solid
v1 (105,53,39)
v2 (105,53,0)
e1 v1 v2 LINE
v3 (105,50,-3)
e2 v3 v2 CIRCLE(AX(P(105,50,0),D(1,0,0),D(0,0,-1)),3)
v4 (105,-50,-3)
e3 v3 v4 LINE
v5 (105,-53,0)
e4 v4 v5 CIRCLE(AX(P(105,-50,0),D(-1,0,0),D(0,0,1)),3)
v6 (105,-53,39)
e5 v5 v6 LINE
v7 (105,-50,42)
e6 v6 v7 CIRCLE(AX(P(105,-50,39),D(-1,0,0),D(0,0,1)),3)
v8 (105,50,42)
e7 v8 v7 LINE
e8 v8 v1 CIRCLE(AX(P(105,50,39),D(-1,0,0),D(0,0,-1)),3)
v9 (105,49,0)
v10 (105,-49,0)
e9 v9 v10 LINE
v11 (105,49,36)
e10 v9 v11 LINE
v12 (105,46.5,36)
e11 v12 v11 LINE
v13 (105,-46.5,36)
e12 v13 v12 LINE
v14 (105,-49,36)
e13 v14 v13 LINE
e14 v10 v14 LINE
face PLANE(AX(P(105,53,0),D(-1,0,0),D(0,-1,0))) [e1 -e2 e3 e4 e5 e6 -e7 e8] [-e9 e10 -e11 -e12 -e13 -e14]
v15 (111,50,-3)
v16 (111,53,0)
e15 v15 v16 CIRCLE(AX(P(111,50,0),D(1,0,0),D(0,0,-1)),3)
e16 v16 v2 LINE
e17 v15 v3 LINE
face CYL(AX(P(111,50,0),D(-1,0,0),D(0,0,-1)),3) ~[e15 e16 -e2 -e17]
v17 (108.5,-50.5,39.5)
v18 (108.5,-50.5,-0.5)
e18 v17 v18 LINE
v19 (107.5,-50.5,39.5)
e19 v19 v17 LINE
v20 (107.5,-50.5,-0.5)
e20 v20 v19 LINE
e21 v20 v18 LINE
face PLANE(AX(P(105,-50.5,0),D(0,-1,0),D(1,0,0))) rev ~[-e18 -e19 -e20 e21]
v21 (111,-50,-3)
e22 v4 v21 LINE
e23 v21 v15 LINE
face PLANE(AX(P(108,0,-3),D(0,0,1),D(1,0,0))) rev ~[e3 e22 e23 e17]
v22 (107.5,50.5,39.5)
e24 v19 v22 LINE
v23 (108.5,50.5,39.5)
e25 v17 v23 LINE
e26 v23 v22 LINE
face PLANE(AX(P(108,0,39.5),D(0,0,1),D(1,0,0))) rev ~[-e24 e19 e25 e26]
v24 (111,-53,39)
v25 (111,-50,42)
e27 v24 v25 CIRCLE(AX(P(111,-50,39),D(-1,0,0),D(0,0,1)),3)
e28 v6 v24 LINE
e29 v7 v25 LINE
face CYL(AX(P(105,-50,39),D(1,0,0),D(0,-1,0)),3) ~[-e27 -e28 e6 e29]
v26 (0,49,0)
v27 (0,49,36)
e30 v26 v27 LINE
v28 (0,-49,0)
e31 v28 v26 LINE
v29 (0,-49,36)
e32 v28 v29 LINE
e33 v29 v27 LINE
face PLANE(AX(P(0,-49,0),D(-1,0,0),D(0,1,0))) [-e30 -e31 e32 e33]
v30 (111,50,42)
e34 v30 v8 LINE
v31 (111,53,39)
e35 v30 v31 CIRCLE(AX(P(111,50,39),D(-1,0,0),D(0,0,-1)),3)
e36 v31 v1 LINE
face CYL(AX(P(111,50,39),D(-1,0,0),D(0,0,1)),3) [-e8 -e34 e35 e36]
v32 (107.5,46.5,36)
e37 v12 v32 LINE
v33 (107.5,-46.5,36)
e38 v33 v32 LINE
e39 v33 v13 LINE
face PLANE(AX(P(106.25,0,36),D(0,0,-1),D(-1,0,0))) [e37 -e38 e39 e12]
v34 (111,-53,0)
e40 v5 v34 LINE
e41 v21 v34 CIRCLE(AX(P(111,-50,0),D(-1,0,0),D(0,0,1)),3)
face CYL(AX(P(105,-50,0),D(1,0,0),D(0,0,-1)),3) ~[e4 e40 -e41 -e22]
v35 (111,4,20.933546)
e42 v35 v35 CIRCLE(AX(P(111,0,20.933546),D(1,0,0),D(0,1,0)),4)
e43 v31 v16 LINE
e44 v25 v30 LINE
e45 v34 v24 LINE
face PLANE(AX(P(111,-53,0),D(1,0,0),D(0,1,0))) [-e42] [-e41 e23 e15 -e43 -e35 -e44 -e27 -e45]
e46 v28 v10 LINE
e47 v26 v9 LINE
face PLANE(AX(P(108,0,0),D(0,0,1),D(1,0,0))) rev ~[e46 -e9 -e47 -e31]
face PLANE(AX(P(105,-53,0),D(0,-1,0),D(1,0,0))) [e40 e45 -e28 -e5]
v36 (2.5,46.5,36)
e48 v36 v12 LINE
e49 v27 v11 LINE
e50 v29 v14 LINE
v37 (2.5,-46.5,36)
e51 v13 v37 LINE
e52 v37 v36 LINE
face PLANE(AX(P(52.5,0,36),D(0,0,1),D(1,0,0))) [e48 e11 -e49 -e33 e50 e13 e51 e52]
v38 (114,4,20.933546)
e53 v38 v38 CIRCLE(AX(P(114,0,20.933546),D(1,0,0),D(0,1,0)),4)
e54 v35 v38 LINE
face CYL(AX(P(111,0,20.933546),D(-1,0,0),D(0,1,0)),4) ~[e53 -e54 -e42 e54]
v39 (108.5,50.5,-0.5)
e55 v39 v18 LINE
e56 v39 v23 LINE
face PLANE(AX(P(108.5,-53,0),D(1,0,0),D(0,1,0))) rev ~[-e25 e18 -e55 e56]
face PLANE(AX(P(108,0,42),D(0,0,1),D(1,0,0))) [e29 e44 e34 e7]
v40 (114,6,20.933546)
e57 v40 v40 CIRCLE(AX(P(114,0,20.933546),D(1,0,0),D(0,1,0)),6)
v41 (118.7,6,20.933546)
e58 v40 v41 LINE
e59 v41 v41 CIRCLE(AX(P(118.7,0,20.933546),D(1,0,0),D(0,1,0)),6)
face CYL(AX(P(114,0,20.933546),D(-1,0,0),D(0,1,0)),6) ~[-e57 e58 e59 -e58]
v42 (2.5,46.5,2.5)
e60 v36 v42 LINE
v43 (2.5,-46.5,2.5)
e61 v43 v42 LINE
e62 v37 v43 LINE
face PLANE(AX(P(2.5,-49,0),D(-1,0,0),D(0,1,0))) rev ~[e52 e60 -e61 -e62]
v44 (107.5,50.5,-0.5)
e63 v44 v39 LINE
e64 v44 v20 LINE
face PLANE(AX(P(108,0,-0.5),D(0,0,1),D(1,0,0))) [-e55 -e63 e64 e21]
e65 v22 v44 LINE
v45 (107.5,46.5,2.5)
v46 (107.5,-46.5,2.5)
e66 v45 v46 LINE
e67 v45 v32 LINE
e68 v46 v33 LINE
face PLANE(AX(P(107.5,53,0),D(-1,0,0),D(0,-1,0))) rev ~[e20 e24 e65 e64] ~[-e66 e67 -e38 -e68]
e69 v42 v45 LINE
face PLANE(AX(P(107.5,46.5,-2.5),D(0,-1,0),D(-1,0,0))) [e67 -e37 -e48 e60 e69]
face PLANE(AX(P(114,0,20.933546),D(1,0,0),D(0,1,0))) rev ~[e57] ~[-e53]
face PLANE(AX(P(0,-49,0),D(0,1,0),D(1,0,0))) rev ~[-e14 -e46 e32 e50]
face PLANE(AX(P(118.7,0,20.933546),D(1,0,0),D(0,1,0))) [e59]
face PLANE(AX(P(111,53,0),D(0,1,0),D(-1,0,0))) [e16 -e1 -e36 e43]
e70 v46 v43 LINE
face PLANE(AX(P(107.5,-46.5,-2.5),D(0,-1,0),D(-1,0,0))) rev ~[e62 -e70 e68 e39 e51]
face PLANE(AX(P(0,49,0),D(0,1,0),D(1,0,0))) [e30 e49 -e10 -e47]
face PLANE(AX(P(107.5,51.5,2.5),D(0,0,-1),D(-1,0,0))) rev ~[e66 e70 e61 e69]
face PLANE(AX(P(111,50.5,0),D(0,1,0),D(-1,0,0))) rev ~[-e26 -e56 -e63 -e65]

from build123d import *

# Parameters (mm, degrees)
F0_W        = 105
F0_H        = 98
F1_DEPTH    = 36
F2_DEPTH    = 42
F3_DEPTH    = 3
F4_T        = 2.5
F4_T3_DEPTH = 41
F4_T5_DEPTH = 103
F5_R        = 3
F6_R        = 4
F7_DEPTH    = 3
F8_R        = 6
F9_DEPTH    = 4.7


# Not quite as in the source:
# - a shell that OpenCascade refuses in one call is made with other operations: the cavity is built on its own and cut out


with BuildPart() as f1:
    # F0 (on Top) → F1 (new body)
    with BuildSketch(Plane.XY):
        with Locations((52.5, 0)):
            Rectangle(F0_W, F0_H)
    extrude(amount=F1_DEPTH)

    # F0 (on Top) → F2 (join)
    with BuildSketch(Plane.XY):
        Polygon((105, 53), (105, 49), (105, -49), (105, -53), (111, -53), (111, 53), align=None)
    extrude(amount=F2_DEPTH)

    # F0 (on Top) → F3 (join)
    with BuildSketch(Plane.XY):
        Polygon((105, 53), (105, 49), (105, -49), (105, -53), (111, -53), (111, 53), align=None)
    extrude(amount=-F3_DEPTH)

    # F4: shell of thickness 2.5, made by hand


with BuildPart() as f4_core1:
    # F4_t2: copy of F1
    add(f1.part)

    # the walls: a layer under each face that stays
    f4_faces = [f4_core1.faces().sort_by_distance(p)[0] for p in [
        (105, 45.4285714286, 38.7857142857),
        (108, 0, 42),
        (111, 0, 19.5),
        (108, 53, 19.5),
        (108, 0, -3),
        (108, -53, 19.5),
        (0, 0, 18),
        (52.5, -49, 18),
        (52.5, 0, 0),
        (52.5, 49, 18),
    ]]
    thicken(f4_faces, amount=-F4_T, mode=Mode.SUBTRACT)

    # F4_s4 → F4_t3 (cut)
    with BuildSketch(Plane.XY.offset(-2.5)):
        Polygon((104.975, 49.025), (107.5, 49), (107.5, 46.5), (105, 46.5), align=None)
        Polygon((104.975, -49.025), (107.5, -49), (107.5, -46.5), (105, -46.5), align=None)
    extrude(amount=F4_T3_DEPTH, mode=Mode.SUBTRACT)

    # F4_s6 → F4_t5 (cut)
    with BuildSketch(Plane.XZ.offset(-51.5)):
        Polygon((104.975, -0.025), (107.5, 0), (107.5, 2.5), (105, 2.5), align=None)
    extrude(amount=F4_T5_DEPTH, mode=Mode.SUBTRACT)


with BuildPart() as f1_1:
    add(f1.part)

    # what is left inside the walls is the cavity
    f4_cavity = [f4_core1.part.solids().sort_by_distance(p)[0] for p in [
        (55, -15.5, 35.975),
    ]]
    add(f4_cavity, mode=Mode.SUBTRACT)

    # F5
    f5_edges = [f1_1.edges().sort_by_distance(p)[0] for p in [
        (108, -53, 42),
        (108, 53, 42),
        (108, 53, -3),
        (108, -53, -3),
    ]]
    fillet(f5_edges, radius=F5_R)

    # F6 (on face) → F7 (join)
    with BuildSketch(Plane.YZ.offset(111)):
        with Locations((0, 20.9335461259)):
            Circle(F6_R)
    extrude(amount=F7_DEPTH)

    # F8 (on face) → F9 (join)
    with BuildSketch(Plane.YZ.offset(114)):
        with Locations((0, 20.9335461259)):
            Circle(F8_R)
    extrude(amount=F9_DEPTH)


solid = f1_1.part
